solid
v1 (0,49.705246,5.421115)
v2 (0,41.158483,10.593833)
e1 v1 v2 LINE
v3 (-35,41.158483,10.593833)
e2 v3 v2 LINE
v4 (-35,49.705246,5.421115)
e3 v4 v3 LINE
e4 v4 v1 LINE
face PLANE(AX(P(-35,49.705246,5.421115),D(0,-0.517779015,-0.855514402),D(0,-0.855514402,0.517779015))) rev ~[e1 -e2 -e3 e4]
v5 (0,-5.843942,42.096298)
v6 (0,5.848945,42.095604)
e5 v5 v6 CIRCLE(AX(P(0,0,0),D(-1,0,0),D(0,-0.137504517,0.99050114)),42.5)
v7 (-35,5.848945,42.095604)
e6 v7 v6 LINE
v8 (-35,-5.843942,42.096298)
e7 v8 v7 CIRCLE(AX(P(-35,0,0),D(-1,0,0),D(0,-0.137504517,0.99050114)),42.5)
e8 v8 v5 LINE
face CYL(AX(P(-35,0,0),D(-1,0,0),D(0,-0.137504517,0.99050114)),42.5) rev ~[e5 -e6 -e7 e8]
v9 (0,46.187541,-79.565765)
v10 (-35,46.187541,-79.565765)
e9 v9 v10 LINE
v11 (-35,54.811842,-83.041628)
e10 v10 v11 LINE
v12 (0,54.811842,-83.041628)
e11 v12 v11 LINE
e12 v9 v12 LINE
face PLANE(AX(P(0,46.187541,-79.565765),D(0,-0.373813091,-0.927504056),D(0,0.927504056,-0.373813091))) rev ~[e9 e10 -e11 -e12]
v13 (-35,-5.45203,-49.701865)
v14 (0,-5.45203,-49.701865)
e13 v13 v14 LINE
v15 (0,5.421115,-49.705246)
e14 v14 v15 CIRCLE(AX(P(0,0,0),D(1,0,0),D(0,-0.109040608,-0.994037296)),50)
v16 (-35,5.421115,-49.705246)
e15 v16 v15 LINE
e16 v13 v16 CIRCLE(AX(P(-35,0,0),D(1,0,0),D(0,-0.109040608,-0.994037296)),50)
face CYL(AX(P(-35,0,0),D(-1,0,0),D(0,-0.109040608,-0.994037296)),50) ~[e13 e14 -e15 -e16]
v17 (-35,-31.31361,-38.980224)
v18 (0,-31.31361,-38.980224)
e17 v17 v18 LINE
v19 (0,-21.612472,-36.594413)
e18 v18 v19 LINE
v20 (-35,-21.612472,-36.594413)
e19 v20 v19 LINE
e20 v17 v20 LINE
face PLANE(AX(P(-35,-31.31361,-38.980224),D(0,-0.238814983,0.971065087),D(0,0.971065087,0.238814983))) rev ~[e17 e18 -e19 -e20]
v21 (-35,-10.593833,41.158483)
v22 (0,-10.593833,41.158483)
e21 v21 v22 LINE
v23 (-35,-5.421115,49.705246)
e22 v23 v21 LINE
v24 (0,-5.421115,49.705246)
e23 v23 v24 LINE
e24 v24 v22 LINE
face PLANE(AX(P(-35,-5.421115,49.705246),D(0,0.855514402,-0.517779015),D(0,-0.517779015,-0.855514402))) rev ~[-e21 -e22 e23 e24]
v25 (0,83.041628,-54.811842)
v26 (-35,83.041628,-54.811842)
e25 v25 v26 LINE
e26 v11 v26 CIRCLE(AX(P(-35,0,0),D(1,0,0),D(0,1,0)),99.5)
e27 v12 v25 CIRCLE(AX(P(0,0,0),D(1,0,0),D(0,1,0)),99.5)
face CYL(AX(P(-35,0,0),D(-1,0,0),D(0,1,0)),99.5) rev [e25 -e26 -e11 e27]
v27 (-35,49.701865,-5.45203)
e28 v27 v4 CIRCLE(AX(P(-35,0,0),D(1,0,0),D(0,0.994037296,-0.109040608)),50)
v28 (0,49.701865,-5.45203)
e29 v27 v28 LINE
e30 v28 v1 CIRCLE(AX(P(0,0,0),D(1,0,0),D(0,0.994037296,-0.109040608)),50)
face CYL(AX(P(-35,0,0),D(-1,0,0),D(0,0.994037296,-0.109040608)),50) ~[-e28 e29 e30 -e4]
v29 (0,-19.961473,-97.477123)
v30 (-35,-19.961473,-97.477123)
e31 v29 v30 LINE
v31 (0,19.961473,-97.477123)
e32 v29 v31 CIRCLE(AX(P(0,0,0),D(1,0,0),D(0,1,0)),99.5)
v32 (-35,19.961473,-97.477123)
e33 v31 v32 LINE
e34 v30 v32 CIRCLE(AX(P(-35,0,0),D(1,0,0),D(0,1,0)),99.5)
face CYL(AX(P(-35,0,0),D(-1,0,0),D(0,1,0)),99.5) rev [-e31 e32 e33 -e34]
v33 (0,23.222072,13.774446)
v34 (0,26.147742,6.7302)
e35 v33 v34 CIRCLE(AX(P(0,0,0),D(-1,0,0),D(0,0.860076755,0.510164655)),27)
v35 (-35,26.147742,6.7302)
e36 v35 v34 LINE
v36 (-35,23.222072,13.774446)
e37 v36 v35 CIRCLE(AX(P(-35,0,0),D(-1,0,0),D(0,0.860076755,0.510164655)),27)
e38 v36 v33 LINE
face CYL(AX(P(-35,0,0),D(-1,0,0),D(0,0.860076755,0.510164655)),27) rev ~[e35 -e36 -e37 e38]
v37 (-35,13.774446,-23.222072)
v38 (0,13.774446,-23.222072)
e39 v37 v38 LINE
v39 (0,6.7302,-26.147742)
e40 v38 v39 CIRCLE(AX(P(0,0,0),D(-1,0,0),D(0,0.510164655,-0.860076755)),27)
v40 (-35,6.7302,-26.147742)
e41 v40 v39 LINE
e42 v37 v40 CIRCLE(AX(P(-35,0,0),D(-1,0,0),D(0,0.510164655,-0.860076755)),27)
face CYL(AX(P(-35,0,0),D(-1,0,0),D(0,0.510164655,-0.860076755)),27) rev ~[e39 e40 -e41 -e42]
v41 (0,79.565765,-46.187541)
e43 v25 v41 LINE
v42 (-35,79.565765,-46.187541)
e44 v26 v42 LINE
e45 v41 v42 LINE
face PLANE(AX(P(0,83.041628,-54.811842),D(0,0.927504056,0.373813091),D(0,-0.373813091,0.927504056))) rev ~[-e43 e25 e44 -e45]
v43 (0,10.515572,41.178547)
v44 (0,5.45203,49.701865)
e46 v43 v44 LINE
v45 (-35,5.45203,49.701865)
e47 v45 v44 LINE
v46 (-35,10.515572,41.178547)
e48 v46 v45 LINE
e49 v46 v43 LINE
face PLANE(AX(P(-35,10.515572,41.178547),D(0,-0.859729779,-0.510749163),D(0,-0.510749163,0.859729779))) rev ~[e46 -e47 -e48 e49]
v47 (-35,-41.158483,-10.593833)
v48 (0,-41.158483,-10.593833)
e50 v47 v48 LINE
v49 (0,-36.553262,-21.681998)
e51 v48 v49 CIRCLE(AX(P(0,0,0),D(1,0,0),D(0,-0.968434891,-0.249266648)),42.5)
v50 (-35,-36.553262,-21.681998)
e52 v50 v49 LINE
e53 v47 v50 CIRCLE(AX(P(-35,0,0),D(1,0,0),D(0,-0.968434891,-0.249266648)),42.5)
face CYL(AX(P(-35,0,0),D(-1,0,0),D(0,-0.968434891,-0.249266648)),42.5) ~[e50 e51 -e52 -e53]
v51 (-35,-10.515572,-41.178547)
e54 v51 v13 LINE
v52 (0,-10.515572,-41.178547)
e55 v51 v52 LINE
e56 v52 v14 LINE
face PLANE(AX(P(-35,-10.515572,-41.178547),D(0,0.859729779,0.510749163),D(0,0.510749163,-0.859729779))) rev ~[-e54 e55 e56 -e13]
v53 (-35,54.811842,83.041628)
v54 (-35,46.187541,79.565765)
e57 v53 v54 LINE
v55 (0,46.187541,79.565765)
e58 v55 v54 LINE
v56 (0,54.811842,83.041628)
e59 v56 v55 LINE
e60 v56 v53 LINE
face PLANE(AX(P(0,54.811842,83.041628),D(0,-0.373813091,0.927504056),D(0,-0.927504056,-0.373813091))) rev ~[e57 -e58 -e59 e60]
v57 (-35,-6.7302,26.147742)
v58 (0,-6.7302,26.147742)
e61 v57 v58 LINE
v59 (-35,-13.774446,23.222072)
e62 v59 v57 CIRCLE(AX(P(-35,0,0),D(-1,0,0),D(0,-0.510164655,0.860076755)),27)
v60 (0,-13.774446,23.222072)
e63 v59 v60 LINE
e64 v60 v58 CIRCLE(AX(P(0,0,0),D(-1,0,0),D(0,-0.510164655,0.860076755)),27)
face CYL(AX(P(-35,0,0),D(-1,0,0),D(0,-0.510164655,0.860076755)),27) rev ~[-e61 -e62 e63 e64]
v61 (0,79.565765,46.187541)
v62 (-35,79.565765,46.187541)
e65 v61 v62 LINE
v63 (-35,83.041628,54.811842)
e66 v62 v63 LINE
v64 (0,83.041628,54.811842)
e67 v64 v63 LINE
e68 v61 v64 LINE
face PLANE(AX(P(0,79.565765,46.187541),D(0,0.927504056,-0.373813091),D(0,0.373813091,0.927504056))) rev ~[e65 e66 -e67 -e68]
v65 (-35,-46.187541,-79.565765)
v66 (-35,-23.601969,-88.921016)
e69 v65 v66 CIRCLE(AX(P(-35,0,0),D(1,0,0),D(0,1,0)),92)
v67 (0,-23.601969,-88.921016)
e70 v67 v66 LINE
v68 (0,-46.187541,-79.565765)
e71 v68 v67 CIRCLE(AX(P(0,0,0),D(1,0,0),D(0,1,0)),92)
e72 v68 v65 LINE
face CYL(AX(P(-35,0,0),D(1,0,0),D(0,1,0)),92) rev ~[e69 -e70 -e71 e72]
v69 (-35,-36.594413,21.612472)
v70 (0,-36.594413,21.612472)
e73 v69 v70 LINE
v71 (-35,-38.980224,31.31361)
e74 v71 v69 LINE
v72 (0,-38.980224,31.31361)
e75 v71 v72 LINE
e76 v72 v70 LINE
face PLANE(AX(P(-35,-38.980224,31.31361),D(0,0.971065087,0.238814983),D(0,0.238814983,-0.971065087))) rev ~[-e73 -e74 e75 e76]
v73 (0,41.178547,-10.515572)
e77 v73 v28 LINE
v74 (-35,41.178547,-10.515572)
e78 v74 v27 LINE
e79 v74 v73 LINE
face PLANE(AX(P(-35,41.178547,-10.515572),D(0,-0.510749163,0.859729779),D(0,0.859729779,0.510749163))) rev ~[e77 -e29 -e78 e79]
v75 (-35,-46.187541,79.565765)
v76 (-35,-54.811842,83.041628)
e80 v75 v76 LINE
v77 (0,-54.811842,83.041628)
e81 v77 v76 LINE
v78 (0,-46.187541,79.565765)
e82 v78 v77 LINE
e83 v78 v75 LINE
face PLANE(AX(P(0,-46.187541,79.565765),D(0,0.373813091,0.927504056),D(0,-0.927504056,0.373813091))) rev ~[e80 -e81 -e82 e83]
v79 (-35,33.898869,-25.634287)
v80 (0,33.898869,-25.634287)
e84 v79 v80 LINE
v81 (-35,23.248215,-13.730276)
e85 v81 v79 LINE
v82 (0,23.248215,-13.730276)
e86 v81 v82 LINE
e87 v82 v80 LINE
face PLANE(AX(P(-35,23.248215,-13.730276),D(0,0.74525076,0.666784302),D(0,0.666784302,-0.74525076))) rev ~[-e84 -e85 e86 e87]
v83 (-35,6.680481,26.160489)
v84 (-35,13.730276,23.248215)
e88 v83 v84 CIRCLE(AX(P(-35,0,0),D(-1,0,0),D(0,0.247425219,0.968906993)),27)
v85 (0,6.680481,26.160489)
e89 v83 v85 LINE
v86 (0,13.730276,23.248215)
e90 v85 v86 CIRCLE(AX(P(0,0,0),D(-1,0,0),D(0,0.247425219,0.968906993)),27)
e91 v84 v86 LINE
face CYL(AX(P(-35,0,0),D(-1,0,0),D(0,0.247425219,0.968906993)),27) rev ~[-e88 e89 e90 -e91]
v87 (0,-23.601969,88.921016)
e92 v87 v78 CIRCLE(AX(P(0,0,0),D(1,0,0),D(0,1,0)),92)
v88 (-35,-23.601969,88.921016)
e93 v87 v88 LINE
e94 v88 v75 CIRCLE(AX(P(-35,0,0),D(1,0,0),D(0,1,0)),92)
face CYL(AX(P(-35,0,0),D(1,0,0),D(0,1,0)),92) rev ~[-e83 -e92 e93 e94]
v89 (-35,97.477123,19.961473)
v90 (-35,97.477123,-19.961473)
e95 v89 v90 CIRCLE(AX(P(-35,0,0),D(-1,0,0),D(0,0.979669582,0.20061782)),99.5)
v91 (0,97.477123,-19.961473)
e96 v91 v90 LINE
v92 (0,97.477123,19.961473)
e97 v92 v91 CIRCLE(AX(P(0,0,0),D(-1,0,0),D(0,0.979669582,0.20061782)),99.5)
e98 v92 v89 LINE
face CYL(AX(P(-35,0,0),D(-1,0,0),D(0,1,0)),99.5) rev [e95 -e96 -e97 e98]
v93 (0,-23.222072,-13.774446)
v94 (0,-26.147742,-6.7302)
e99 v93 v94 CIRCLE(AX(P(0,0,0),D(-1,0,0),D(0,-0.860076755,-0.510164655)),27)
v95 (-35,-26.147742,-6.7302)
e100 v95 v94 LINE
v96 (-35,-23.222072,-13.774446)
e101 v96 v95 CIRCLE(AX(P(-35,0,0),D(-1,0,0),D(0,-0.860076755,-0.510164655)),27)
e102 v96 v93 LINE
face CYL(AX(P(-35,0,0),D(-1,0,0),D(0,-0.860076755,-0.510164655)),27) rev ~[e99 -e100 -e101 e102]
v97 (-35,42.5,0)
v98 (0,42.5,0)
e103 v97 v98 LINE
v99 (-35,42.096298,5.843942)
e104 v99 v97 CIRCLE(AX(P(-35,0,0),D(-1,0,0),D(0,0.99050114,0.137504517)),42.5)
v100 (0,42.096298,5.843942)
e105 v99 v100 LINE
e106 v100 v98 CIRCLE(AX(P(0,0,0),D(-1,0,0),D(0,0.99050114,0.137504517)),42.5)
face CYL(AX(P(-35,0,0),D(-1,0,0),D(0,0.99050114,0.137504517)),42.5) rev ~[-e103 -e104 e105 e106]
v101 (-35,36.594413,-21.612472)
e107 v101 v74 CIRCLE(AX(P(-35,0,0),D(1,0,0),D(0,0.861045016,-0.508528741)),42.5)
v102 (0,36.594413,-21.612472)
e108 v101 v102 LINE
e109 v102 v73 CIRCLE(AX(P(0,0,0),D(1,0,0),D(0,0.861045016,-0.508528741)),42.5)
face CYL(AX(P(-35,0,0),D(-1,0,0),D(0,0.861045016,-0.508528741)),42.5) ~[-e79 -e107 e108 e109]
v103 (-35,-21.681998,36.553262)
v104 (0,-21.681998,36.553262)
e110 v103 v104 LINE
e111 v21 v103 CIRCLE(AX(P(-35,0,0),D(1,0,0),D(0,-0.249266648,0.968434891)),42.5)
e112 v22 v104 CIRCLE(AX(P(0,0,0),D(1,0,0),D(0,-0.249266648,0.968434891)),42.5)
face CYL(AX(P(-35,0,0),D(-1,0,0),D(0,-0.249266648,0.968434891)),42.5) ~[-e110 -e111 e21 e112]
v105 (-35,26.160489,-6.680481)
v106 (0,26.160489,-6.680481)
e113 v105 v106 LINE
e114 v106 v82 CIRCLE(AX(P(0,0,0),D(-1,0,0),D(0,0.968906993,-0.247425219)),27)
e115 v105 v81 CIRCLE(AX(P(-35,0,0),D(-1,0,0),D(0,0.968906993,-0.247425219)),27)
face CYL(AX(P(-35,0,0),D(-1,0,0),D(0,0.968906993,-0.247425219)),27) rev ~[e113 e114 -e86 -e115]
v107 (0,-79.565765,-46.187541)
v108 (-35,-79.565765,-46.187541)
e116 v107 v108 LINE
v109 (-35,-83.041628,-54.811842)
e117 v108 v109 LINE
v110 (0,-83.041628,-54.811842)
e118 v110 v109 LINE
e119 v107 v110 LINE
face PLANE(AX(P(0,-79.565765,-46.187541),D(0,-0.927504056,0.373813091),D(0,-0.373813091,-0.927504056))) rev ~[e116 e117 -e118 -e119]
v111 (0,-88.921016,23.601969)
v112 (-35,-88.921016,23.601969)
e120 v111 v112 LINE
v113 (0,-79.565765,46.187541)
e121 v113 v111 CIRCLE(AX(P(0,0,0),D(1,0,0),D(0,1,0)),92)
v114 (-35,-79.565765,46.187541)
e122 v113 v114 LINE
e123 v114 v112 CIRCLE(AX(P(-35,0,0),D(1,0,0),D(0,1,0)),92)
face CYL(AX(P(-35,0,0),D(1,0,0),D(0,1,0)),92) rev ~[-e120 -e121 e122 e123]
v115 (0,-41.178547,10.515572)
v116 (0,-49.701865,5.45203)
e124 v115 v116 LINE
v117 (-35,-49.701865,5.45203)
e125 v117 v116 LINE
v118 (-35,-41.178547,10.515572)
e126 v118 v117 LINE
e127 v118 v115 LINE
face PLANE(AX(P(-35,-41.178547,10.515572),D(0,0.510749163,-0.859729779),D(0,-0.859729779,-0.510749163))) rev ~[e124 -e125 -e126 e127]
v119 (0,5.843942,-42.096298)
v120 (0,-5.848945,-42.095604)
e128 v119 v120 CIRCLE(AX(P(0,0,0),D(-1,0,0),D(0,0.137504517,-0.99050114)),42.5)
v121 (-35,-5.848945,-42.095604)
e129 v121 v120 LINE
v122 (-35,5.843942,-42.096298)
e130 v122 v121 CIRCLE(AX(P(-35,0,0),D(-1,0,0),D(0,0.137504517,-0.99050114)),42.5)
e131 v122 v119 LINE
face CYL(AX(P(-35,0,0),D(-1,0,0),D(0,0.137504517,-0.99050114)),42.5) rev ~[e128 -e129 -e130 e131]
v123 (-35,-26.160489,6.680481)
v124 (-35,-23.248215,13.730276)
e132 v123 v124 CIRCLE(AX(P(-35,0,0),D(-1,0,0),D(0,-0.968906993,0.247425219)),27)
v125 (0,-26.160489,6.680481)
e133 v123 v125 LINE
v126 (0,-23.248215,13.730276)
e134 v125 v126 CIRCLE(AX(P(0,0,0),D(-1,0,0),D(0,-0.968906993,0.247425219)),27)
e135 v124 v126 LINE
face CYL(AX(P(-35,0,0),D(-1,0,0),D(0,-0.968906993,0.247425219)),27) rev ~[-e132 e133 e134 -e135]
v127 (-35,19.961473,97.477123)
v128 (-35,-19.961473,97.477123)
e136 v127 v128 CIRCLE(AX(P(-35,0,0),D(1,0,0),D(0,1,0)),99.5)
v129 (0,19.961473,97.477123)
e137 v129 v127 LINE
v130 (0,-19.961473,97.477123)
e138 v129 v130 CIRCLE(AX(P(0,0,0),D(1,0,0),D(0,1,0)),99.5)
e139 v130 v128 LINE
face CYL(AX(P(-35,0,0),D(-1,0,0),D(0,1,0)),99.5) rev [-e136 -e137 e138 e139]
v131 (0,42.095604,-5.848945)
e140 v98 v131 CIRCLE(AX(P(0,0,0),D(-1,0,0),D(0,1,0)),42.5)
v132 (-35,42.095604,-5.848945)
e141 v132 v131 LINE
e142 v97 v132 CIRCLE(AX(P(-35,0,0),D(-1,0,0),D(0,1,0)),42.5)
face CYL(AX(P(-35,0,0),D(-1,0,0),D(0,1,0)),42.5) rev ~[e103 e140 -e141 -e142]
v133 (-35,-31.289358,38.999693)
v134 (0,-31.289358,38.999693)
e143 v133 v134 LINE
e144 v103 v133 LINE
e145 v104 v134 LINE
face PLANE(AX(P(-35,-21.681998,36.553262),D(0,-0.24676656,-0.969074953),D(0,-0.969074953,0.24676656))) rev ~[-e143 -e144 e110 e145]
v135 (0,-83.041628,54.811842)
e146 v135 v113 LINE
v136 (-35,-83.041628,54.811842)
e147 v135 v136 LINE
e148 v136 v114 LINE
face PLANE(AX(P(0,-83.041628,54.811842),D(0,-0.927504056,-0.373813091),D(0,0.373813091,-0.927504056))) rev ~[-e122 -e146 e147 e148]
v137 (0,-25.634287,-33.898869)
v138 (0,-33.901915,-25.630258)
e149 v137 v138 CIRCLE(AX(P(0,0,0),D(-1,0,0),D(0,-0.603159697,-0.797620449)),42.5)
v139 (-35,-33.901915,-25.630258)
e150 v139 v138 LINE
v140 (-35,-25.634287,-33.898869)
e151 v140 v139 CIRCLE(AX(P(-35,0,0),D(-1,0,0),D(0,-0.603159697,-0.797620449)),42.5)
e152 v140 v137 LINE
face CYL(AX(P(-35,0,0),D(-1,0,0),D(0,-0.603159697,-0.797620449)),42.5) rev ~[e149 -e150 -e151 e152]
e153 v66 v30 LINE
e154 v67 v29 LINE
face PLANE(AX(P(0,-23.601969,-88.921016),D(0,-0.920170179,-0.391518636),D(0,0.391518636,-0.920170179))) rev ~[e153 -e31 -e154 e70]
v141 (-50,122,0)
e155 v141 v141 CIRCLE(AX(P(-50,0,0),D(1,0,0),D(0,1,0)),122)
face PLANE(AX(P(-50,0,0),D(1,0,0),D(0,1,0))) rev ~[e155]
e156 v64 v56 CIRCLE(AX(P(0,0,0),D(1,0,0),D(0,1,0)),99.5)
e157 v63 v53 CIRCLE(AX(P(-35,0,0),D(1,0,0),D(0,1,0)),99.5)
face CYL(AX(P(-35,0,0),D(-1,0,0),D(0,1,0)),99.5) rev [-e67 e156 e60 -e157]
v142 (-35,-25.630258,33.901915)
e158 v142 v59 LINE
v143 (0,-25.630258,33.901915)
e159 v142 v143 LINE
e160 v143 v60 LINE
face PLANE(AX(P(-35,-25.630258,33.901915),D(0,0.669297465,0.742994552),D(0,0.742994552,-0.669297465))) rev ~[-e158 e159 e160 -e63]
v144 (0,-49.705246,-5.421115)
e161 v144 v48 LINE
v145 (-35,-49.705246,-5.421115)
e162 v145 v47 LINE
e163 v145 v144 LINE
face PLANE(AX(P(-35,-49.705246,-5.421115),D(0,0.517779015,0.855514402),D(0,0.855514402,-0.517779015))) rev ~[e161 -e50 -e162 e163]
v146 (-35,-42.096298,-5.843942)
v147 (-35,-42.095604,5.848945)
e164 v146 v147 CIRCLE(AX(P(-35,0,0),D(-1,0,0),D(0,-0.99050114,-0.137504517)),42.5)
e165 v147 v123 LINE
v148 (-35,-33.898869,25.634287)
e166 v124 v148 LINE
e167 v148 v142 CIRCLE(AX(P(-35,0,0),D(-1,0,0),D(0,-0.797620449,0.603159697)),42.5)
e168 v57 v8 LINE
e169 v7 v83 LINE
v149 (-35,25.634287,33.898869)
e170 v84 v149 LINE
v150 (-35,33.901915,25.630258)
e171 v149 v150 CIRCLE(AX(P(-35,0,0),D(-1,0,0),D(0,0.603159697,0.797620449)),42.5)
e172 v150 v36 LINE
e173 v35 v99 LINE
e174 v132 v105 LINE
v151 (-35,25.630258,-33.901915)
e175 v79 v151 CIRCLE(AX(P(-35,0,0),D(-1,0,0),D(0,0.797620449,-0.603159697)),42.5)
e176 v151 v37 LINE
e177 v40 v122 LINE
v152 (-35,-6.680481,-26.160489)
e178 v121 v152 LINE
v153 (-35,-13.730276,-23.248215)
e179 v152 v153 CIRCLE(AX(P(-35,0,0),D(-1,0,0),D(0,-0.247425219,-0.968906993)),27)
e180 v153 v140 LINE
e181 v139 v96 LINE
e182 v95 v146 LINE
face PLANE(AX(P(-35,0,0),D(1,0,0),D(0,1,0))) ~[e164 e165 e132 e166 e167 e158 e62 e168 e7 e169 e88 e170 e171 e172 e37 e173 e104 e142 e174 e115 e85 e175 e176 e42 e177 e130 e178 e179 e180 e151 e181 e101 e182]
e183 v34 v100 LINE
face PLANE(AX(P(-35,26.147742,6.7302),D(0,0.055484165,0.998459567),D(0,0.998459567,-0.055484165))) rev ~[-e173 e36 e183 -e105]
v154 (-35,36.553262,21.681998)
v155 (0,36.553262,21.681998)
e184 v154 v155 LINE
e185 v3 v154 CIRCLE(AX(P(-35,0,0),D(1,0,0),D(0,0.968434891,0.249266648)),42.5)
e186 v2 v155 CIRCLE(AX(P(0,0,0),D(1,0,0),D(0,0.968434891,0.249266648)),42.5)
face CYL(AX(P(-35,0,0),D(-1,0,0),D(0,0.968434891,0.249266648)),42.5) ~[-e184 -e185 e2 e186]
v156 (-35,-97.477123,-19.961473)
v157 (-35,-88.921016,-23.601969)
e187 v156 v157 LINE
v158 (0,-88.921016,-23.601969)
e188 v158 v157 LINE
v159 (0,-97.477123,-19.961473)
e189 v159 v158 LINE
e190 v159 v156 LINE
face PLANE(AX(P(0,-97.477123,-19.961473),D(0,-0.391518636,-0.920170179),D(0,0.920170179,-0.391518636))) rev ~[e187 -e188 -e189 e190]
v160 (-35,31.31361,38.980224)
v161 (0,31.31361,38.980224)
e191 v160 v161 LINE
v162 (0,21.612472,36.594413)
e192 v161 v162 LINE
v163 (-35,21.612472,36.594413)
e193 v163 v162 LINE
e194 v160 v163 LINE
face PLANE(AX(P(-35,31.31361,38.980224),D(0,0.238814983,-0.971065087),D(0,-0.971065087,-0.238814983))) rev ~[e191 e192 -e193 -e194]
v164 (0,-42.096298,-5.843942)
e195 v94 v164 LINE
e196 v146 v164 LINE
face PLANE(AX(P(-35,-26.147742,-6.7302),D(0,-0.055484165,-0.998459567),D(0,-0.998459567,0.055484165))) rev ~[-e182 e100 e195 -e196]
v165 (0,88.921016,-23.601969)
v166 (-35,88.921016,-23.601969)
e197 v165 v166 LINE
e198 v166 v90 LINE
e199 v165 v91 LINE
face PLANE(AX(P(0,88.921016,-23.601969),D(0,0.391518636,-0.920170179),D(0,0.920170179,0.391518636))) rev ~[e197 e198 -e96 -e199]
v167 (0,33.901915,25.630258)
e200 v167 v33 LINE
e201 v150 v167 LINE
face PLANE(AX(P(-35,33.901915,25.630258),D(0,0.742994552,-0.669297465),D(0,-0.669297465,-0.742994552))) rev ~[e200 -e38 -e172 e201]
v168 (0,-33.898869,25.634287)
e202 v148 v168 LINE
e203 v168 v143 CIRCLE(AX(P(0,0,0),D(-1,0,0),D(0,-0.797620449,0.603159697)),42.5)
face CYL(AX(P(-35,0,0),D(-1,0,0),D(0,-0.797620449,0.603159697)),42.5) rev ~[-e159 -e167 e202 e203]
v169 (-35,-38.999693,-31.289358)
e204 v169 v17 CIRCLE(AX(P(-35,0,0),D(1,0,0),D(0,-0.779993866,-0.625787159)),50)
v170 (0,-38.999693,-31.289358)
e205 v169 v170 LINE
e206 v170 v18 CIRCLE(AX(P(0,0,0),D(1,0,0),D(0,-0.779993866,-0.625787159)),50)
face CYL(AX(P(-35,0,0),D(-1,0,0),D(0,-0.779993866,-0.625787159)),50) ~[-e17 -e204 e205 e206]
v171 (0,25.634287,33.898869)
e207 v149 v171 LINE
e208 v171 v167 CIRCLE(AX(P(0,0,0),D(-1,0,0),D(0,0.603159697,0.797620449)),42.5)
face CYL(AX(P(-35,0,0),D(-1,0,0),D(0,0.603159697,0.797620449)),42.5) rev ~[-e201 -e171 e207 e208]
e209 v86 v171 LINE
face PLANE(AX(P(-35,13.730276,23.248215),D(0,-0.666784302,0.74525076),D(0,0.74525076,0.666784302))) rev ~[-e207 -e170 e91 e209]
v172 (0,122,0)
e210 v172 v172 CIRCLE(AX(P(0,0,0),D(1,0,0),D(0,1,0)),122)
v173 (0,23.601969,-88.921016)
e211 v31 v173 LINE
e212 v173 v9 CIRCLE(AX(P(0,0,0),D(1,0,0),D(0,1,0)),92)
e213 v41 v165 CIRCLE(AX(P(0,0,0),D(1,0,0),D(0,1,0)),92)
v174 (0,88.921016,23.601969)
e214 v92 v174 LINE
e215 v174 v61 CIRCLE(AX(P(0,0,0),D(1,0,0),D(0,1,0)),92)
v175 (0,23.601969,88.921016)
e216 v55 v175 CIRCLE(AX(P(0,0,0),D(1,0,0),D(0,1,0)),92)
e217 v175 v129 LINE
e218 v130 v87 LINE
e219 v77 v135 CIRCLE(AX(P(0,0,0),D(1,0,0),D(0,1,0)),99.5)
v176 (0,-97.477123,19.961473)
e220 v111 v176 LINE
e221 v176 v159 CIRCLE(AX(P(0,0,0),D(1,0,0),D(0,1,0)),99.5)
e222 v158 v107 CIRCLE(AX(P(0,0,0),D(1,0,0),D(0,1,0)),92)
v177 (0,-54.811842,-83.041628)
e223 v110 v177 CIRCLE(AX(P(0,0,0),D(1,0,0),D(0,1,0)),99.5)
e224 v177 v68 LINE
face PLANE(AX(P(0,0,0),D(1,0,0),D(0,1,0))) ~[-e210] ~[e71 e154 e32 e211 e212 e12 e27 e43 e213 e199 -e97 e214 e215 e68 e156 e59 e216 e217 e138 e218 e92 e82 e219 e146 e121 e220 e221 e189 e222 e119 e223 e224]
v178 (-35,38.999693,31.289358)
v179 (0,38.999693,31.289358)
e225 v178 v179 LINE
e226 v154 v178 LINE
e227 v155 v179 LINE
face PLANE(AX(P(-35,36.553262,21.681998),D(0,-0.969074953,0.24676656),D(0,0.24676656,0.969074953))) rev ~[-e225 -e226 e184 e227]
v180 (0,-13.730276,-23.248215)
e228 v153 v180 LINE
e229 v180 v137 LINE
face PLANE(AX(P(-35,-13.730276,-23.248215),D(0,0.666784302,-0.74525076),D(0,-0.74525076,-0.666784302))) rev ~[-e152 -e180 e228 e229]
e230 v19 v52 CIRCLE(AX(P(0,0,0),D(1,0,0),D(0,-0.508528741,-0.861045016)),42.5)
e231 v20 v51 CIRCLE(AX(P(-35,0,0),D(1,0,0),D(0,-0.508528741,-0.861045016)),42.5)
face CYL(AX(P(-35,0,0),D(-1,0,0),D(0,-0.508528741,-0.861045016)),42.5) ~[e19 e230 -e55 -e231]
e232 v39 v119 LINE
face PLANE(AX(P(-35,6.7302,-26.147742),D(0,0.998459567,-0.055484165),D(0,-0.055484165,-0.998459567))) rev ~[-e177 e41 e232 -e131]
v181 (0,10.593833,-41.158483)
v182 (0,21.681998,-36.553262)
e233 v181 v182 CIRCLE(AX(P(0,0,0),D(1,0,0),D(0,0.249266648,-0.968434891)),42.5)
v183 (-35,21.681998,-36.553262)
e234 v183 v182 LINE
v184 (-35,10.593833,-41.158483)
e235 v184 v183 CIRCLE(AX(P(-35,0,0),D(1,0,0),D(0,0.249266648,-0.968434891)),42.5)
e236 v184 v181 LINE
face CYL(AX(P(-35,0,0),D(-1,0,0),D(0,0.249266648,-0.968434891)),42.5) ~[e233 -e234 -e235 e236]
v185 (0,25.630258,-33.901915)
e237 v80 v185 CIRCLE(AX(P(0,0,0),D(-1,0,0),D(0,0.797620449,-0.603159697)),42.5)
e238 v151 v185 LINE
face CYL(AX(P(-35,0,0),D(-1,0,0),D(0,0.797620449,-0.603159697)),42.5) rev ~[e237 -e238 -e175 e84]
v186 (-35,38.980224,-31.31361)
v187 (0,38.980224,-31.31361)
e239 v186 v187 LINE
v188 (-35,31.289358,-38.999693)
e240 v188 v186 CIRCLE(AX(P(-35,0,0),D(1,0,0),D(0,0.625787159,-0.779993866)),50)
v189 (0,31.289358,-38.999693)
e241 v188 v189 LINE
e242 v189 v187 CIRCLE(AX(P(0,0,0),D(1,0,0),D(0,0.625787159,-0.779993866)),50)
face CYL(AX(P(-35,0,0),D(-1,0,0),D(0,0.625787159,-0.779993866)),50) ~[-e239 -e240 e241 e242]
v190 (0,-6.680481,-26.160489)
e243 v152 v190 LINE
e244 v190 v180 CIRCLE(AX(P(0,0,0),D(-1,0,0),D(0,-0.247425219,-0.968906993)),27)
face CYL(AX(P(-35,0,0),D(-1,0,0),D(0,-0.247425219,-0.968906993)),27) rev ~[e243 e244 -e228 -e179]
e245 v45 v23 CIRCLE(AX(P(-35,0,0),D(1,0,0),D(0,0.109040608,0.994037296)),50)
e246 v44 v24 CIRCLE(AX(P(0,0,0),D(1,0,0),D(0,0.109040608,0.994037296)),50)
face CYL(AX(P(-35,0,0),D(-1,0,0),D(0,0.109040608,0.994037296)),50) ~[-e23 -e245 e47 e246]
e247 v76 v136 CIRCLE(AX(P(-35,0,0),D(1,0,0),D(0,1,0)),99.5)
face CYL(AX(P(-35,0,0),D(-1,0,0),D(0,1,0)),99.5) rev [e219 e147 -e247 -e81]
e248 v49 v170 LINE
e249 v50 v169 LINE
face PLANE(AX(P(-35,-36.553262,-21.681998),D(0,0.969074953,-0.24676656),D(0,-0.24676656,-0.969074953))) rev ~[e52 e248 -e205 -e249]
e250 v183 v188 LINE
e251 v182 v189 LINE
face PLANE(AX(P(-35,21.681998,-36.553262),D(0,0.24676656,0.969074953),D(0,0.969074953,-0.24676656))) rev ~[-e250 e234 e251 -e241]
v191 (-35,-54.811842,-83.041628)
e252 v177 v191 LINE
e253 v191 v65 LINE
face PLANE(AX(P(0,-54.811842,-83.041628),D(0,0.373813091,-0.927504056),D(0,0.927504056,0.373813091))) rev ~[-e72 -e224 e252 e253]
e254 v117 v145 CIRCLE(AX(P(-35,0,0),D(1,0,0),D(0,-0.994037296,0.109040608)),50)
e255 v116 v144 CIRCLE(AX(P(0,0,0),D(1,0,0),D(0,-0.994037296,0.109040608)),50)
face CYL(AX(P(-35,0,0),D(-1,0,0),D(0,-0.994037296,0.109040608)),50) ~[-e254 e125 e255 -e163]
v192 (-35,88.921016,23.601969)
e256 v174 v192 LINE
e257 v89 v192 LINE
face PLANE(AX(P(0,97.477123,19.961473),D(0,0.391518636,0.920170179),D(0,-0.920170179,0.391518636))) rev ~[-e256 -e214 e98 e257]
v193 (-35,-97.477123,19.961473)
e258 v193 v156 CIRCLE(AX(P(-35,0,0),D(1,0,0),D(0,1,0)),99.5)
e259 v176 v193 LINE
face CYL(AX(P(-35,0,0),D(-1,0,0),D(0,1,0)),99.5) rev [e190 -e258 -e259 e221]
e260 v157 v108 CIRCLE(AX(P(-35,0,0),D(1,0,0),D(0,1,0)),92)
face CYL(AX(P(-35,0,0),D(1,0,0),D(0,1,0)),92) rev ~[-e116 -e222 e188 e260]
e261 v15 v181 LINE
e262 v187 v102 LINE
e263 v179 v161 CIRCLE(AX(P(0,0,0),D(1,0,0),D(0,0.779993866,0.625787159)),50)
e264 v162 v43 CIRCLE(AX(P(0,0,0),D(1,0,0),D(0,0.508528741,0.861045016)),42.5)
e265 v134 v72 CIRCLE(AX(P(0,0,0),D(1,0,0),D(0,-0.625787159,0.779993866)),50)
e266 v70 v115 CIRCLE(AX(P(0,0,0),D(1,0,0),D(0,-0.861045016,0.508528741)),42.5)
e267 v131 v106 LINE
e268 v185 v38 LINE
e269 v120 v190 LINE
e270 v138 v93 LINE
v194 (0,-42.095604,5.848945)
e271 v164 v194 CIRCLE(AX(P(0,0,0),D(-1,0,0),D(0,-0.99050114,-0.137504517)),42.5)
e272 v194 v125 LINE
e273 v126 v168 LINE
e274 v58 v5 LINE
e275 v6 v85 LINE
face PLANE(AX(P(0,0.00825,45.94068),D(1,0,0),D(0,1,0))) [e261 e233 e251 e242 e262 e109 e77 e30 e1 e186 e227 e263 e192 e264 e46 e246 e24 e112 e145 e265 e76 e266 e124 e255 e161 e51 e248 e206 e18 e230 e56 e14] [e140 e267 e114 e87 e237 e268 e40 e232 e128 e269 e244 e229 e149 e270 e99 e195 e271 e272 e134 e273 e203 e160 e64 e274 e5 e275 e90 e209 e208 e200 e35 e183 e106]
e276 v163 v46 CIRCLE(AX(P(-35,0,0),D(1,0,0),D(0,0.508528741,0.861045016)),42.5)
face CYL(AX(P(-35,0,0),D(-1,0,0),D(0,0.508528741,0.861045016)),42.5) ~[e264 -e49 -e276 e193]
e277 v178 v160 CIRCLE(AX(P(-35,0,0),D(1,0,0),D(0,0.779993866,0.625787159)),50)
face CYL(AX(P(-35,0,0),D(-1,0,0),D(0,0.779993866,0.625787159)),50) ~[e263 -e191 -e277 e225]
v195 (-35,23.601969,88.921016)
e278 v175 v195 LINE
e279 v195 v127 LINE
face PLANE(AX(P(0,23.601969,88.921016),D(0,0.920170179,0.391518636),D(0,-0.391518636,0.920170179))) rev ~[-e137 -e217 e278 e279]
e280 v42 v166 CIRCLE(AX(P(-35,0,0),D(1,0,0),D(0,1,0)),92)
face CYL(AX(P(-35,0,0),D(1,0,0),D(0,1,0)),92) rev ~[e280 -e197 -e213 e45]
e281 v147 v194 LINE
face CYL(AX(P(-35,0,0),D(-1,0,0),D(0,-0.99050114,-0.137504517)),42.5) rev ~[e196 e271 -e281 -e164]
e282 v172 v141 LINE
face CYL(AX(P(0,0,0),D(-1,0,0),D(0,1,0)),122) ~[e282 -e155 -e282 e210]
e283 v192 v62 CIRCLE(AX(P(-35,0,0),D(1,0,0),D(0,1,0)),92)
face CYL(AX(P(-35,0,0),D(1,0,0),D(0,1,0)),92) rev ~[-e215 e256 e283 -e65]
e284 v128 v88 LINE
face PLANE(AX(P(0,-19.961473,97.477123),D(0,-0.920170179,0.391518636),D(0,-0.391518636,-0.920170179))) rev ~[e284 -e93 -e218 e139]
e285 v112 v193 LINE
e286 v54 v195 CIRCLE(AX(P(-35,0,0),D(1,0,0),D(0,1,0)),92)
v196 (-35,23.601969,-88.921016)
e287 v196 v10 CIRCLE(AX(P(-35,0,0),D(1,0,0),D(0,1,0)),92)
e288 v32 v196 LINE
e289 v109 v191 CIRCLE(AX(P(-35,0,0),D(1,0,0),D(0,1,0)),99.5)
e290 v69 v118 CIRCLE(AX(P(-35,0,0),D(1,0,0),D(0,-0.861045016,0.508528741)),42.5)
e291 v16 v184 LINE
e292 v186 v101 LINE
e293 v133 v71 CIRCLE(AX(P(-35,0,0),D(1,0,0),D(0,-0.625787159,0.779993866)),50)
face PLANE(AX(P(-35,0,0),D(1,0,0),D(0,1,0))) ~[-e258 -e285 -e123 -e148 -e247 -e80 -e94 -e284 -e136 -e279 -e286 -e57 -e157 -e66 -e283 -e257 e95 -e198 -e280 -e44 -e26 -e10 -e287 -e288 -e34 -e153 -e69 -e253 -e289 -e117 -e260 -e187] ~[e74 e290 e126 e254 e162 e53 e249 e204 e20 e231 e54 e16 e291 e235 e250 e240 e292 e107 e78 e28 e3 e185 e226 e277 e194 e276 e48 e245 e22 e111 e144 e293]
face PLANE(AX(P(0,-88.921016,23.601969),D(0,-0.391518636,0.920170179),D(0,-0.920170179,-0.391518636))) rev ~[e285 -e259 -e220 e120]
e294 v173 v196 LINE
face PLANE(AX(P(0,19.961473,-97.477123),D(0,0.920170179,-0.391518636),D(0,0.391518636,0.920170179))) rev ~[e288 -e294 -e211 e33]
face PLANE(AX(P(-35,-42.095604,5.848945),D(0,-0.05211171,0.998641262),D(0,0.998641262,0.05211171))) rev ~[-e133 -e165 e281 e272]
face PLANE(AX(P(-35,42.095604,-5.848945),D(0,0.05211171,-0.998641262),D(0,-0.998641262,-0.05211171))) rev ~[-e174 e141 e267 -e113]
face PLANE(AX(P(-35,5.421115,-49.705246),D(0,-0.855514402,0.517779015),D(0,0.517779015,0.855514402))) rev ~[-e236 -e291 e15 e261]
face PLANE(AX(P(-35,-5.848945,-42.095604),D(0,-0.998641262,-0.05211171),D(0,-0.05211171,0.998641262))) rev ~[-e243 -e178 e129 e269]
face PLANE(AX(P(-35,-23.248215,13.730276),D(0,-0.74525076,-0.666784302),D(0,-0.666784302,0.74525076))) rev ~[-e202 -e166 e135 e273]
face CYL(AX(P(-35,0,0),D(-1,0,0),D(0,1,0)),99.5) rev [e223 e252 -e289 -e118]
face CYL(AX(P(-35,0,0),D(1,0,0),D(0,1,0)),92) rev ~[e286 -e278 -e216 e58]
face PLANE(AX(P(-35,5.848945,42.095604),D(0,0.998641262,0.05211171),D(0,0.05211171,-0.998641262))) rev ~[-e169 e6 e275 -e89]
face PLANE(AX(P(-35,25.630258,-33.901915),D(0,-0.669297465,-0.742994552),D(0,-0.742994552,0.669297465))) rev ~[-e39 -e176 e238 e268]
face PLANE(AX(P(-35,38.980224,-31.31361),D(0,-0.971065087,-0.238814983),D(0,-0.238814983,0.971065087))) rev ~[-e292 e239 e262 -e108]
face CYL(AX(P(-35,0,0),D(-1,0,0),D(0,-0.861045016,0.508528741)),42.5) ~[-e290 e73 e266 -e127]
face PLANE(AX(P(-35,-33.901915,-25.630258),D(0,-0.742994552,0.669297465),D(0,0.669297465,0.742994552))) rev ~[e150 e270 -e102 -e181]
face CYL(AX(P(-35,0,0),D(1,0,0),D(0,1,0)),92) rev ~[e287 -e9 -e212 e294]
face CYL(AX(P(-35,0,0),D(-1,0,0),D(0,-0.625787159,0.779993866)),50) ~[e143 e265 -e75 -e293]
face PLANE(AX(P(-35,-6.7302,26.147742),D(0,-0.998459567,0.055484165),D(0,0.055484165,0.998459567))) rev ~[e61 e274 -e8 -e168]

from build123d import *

# Parameters (mm, degrees)
F3_DEPTH = 35
F6_DEPTH = 35
F7_R     = 116.5
F7_R_2   = 99.5
F8_DEPTH = 35


# Not quite as in the source:
# - a feature names something its author has since deleted; it is built from what else it names


with BuildPart() as f1:
    # F0 (on Top) → F1 (revolve)
    with BuildSketch(Plane.XY):
        Polygon((-35, 92), (0, 92), (0, 122), (-50, 122), (-50, 0), (-35, 0), align=None)
    revolve(axis=Axis((-42.5, 0, 0), (1, 0, 0)))

    # F2 (on face) → F3 (cut)
    with BuildSketch(Plane.YZ):
        with BuildLine():
            ThreePointArc((-23.6019687167, 88.9210159225), (0, 92), (23.6019687167, 88.9210159225))
            Line((23.6019687167, 88.9210159225), (19.9614730536, 97.4771234369))
            ThreePointArc((19.9614730536, 97.4771234369), (0, 99.5), (-19.9614730536, 97.4771234369))
            Line((-19.9614730536, 97.4771234369), (-23.6019687167, 88.9210159225))
        make_face()
        with BuildLine():
            ThreePointArc((-19.9614730536, 97.4771234369), (0, 99.5), (19.9614730536, 97.4771234369))
            Line((19.9614730536, 97.4771234369), (12.8102793756, 114.2842803815))
            ThreePointArc((12.8102793756, 114.2842803815), (0, 115), (-12.8102793756, 114.2842803815))
            Line((-12.8102793756, 114.2842803815), (-19.9614730536, 97.4771234369))
        make_face()
        with BuildLine():
            ThreePointArc((-79.5657654778, 46.1875412199), (-65.0538238692, 65.0538238692), (-46.1875412199, 79.5657654778))
            Line((-46.1875412199, 79.5657654778), (-54.8118420341, 83.0416279515))
            ThreePointArc((-54.8118420341, 83.0416279515), (-70.3571247281, 70.3571247281), (-83.0416279515, 54.8118420341))
            Line((-83.0416279515, 54.8118420341), (-79.5657654778, 46.1875412199))
        make_face()
        with BuildLine():
            ThreePointArc((-83.0416279515, 54.8118420341), (-70.3571247281, 70.3571247281), (-54.8118420341, 83.0416279515))
            Line((-54.8118420341, 83.0416279515), (-71.7529542254, 89.8694250562))
            ThreePointArc((-71.7529542254, 89.8694250562), (-81.3172798365, 81.3172798365), (-89.8694250562, 71.7529542254))
            Line((-89.8694250562, 71.7529542254), (-83.0416279515, 54.8118420341))
        make_face()
        with BuildLine():
            ThreePointArc((-88.9210159225, -23.6019687167), (-92, 0), (-88.9210159225, 23.6019687167))
            Line((-88.9210159225, 23.6019687167), (-97.4771234369, 19.9614730536))
            ThreePointArc((-97.4771234369, 19.9614730536), (-99.5, 0), (-97.4771234369, -19.9614730536))
            Line((-97.4771234369, -19.9614730536), (-88.9210159225, -23.6019687167))
        make_face()
        with BuildLine():
            ThreePointArc((-97.4771234369, -19.9614730536), (-99.5, 0), (-97.4771234369, 19.9614730536))
            Line((-97.4771234369, 19.9614730536), (-114.2842803815, 12.8102793756))
            ThreePointArc((-114.2842803815, 12.8102793756), (-115, 0), (-114.2842803815, -12.8102793756))
            Line((-114.2842803815, -12.8102793756), (-97.4771234369, -19.9614730536))
        make_face()
        with BuildLine():
            ThreePointArc((-46.1875412199, -79.5657654778), (-65.0538238692, -65.0538238692), (-79.5657654778, -46.1875412199))
            Line((-79.5657654778, -46.1875412199), (-83.0416279515, -54.8118420341))
            ThreePointArc((-83.0416279515, -54.8118420341), (-70.3571247281, -70.3571247281), (-54.8118420341, -83.0416279515))
            Line((-54.8118420341, -83.0416279515), (-46.1875412199, -79.5657654778))
        make_face()
        with BuildLine():
            ThreePointArc((-54.8118420341, -83.0416279515), (-70.3571247281, -70.3571247281), (-83.0416279515, -54.8118420341))
            Line((-83.0416279515, -54.8118420341), (-89.8694250562, -71.7529542254))
            ThreePointArc((-89.8694250562, -71.7529542254), (-81.3172798365, -81.3172798365), (-71.7529542254, -89.8694250562))
            Line((-71.7529542254, -89.8694250562), (-54.8118420341, -83.0416279515))
        make_face()
        with BuildLine():
            Line((19.9614730536, -97.4771234369), (23.6019687167, -88.9210159225))
            ThreePointArc((23.6019687167, -88.9210159225), (0, -92), (-23.6019687167, -88.9210159225))
            Line((-23.6019687167, -88.9210159225), (-19.9614730536, -97.4771234369))
            ThreePointArc((-19.9614730536, -97.4771234369), (0, -99.5), (19.9614730536, -97.4771234369))
        make_face()
        with BuildLine():
            Line((12.8102793756, -114.2842803815), (19.9614730536, -97.4771234369))
            ThreePointArc((19.9614730536, -97.4771234369), (0, -99.5), (-19.9614730536, -97.4771234369))
            Line((-19.9614730536, -97.4771234369), (-12.8102793756, -114.2842803815))
            ThreePointArc((-12.8102793756, -114.2842803815), (0, -115), (12.8102793756, -114.2842803815))
        make_face()
        with BuildLine():
            Line((83.0416279515, -54.8118420341), (79.5657654778, -46.1875412199))
            ThreePointArc((79.5657654778, -46.1875412199), (65.0538238692, -65.0538238692), (46.1875412199, -79.5657654778))
            Line((46.1875412199, -79.5657654778), (54.8118420341, -83.0416279515))
            ThreePointArc((54.8118420341, -83.0416279515), (70.3571247281, -70.3571247281), (83.0416279515, -54.8118420341))
        make_face()
        with BuildLine():
            Line((89.8694250562, -71.7529542254), (83.0416279515, -54.8118420341))
            ThreePointArc((83.0416279515, -54.8118420341), (70.3571247281, -70.3571247281), (54.8118420341, -83.0416279515))
            Line((54.8118420341, -83.0416279515), (71.7529542254, -89.8694250562))
            ThreePointArc((71.7529542254, -89.8694250562), (81.3172798365, -81.3172798365), (89.8694250562, -71.7529542254))
        make_face()
        with BuildLine():
            Line((97.4771234369, 19.9614730536), (88.9210159225, 23.6019687167))
            ThreePointArc((88.9210159225, 23.6019687167), (91.2270065958, 11.9009775886), (92, 0))
            ThreePointArc((92, 0), (91.2270065958, -11.9009775886), (88.9210159225, -23.6019687167))
            Line((88.9210159225, -23.6019687167), (97.4771234369, -19.9614730536))
            ThreePointArc((97.4771234369, -19.9614730536), (98.9929891002, -10.0318547146), (99.5, 0))
            ThreePointArc((99.5, 0), (98.9929891002, 10.0318547146), (97.4771234369, 19.9614730536))
        make_face()
        with BuildLine():
            Line((114.2842803815, 12.8102793756), (97.4771234369, 19.9614730536))
            ThreePointArc((97.4771234369, 19.9614730536), (98.9929891002, 10.0318547146), (99.5, 0))
            ThreePointArc((99.5, 0), (98.9929891002, -10.0318547146), (97.4771234369, -19.9614730536))
            Line((97.4771234369, -19.9614730536), (114.2842803815, -12.8102793756))
            ThreePointArc((114.2842803815, -12.8102793756), (115, 0), (114.2842803815, 12.8102793756))
        make_face()
        with BuildLine():
            Line((54.8118420341, 83.0416279515), (46.1875412199, 79.5657654778))
            ThreePointArc((46.1875412199, 79.5657654778), (65.0538238692, 65.0538238692), (79.5657654778, 46.1875412199))
            Line((79.5657654778, 46.1875412199), (83.0416279515, 54.8118420341))
            ThreePointArc((83.0416279515, 54.8118420341), (70.3571247281, 70.3571247281), (54.8118420341, 83.0416279515))
        make_face()
        with BuildLine():
            Line((71.7529542254, 89.8694250562), (54.8118420341, 83.0416279515))
            ThreePointArc((54.8118420341, 83.0416279515), (70.3571247281, 70.3571247281), (83.0416279515, 54.8118420341))
            Line((83.0416279515, 54.8118420341), (89.8694250562, 71.7529542254))
            ThreePointArc((89.8694250562, 71.7529542254), (81.3172798365, 81.3172798365), (71.7529542254, 89.8694250562))
        make_face()
    extrude(amount=-F3_DEPTH, mode=Mode.SUBTRACT)

    # F5 (on face) → F6 (join)
    with BuildSketch(Plane.YZ.offset(-35)):
        with BuildLine():
            Line((5.8489450002, 42.0956035992), (5.452030419, 49.7018647971))
            ThreePointArc((5.452030419, 49.7018647971), (0.0155501533, 49.9999975819), (-5.4211145011, 49.7052463787))
            Line((-5.4211145011, 49.7052463787), (-5.8439419576, 42.0962984406))
            ThreePointArc((-5.8439419576, 42.0962984406), (0.0025255316, 42.499999925), (5.8489450002, 42.0956035992))
        make_face()
        with BuildLine():
            Line((10.5155718212, 41.1785471972), (5.452030419, 49.7018647971))
            Line((5.452030419, 49.7018647971), (5.8489450002, 42.0956035992))
            ThreePointArc((5.8489450002, 42.0956035992), (8.1950961441, 41.7024027987), (10.5155718212, 41.1785471972))
        make_face()
        with BuildLine():
            Line((-5.8439419576, 42.0962984406), (-5.4211145011, 49.7052463787))
            Line((-5.4211145011, 49.7052463787), (-10.5938325524, 41.1584828663))
            ThreePointArc((-10.5938325524, 41.1584828663), (-8.2322525607, 41.6950838562), (-5.8439419576, 42.0962984406))
        make_face()
        with BuildLine():
            ThreePointArc((10.5155718212, 41.1785471972), (8.1950961441, 41.7024027987), (5.8489450002, 42.0956035992))
            Line((5.8489450002, 42.0956035992), (6.6804809217, 26.1604888076))
            ThreePointArc((6.6804809217, 26.1604888076), (10.3087382214, 24.9545570244), (13.7302760127, 23.2482154286))
            Line((13.7302760127, 23.2482154286), (25.6342871031, 33.8988690772))
            ThreePointArc((25.6342871031, 33.8988690772), (23.6617949268, 35.303958147), (21.6124715015, 36.5944131746))
            ThreePointArc((21.6124715015, 36.5944131746), (16.2267175708, 39.2803212421), (10.5155718212, 41.1785471972))
        make_face()
        with BuildLine():
            Line((-6.7301995039, 26.1477420562), (-5.8439419576, 42.0962984406))
            ThreePointArc((-5.8439419576, 42.0962984406), (-8.2322525607, 41.6950838562), (-10.5938325524, 41.1584828663))
            ThreePointArc((-10.5938325524, 41.1584828663), (-16.3013594868, 39.2494035481), (-21.6819978197, 36.5532621054))
            ThreePointArc((-21.6819978197, 36.5532621054), (-23.6932437548, 35.2828598667), (-25.6302580907, 33.9019154356))
            Line((-25.6302580907, 33.9019154356), (-13.7744456737, 23.2220723964))
            ThreePointArc((-13.7744456737, 23.2220723964), (-10.3561577916, 24.9349151953), (-6.7301995039, 26.1477420562))
        make_face()
        with BuildLine():
            Line((31.3136099496, 38.9802236003), (21.6124715015, 36.5944131746))
            ThreePointArc((21.6124715015, 36.5944131746), (23.6617949268, 35.303958147), (25.6342871031, 33.8988690772))
            Line((25.6342871031, 33.8988690772), (31.3136099496, 38.9802236003))
        make_face()
        with BuildLine():
            ThreePointArc((-25.6302580907, 33.9019154356), (-23.6932437548, 35.2828598667), (-21.6819978197, 36.5532621054))
            Line((-21.6819978197, 36.5532621054), (-31.2893579551, 38.9996933162))
            Line((-31.2893579551, 38.9996933162), (-25.6302580907, 33.9019154356))
        make_face()
        with BuildLine():
            Line((31.3136099496, 38.9802236003), (25.6342871031, 33.8988690772))
            ThreePointArc((25.6342871031, 33.8988690772), (30.0538239679, 30.0502523268), (33.9019154356, 25.6302580907))
            Line((33.9019154356, 25.6302580907), (38.9996933162, 31.2893579551))
            ThreePointArc((38.9996933162, 31.2893579551), (35.3663329683, 35.3443417306), (31.3136099496, 38.9802236003))
        make_face()
        with BuildLine():
            ThreePointArc((-33.8988690772, 25.6342871031), (-30.0502523268, 30.0538239679), (-25.6302580907, 33.9019154356))
            Line((-25.6302580907, 33.9019154356), (-31.2893579551, 38.9996933162))
            ThreePointArc((-31.2893579551, 38.9996933162), (-35.3443417306, 35.3663329683), (-38.9802236003, 31.3136099496))
            Line((-38.9802236003, 31.3136099496), (-33.8988690772, 25.6342871031))
        make_face()
        with BuildLine():
            Line((33.9019154356, 25.6302580907), (23.2220723964, 13.7744456737))
            ThreePointArc((23.2220723964, 13.7744456737), (24.9349151953, 10.3561577916), (26.1477420562, 6.7301995039))
            Line((26.1477420562, 6.7301995039), (42.0962984406, 5.8439419576))
            ThreePointArc((42.0962984406, 5.8439419576), (41.6950838562, 8.2322525607), (41.1584828663, 10.5938325524))
            ThreePointArc((41.1584828663, 10.5938325524), (39.2494035481, 16.3013594868), (36.5532621054, 21.6819978197))
            ThreePointArc((36.5532621054, 21.6819978197), (35.2828598667, 23.6932437548), (33.9019154356, 25.6302580907))
        make_face()
        with BuildLine():
            Line((38.9996933162, 31.2893579551), (33.9019154356, 25.6302580907))
            ThreePointArc((33.9019154356, 25.6302580907), (35.2828598667, 23.6932437548), (36.5532621054, 21.6819978197))
            Line((36.5532621054, 21.6819978197), (38.9996933162, 31.2893579551))
        make_face()
        with BuildLine():
            ThreePointArc((-26.1604888076, 6.6804809217), (-24.9545570244, 10.3087382214), (-23.2482154286, 13.7302760127))
            Line((-23.2482154286, 13.7302760127), (-33.8988690772, 25.6342871031))
            ThreePointArc((-33.8988690772, 25.6342871031), (-35.303958147, 23.6617949268), (-36.5944131746, 21.6124715015))
            ThreePointArc((-36.5944131746, 21.6124715015), (-39.2803212421, 16.2267175708), (-41.1785471972, 10.5155718212))
            ThreePointArc((-41.1785471972, 10.5155718212), (-41.7024027987, 8.1950961441), (-42.0956035992, 5.8489450002))
            Line((-42.0956035992, 5.8489450002), (-26.1604888076, 6.6804809217))
        make_face()
        with BuildLine():
            ThreePointArc((-36.5944131746, 21.6124715015), (-35.303958147, 23.6617949268), (-33.8988690772, 25.6342871031))
            Line((-33.8988690772, 25.6342871031), (-38.9802236003, 31.3136099496))
            Line((-38.9802236003, 31.3136099496), (-36.5944131746, 21.6124715015))
        make_face()
        with BuildLine():
            ThreePointArc((41.1584828663, 10.5938325524), (41.6950838562, 8.2322525607), (42.0962984406, 5.8439419576))
            Line((42.0962984406, 5.8439419576), (49.7052463787, 5.4211145011))
            Line((49.7052463787, 5.4211145011), (41.1584828663, 10.5938325524))
        make_face()
        with BuildLine():
            Line((49.7052463787, 5.4211145011), (42.0962984406, 5.8439419576))
            ThreePointArc((42.0962984406, 5.8439419576), (42.3989544902, 2.9289346422), (42.5, 0))
            ThreePointArc((42.5, 0), (42.3987803655, -2.9314541641), (42.0956035992, -5.8489450002))
            Line((42.0956035992, -5.8489450002), (49.7018647971, -5.452030419))
            ThreePointArc((49.7018647971, -5.452030419), (49.9999975819, -0.0155501533), (49.7052463787, 5.4211145011))
        make_face()
        with BuildLine():
            ThreePointArc((-23.2220723964, -13.7744456737), (-24.9349151953, -10.3561577916), (-26.1477420562, -6.7301995039))
            Line((-26.1477420562, -6.7301995039), (-42.0962984406, -5.8439419576))
            ThreePointArc((-42.0962984406, -5.8439419576), (-41.6950838562, -8.2322525607), (-41.1584828663, -10.5938325524))
            ThreePointArc((-41.1584828663, -10.5938325524), (-39.2494035481, -16.3013594868), (-36.5532621054, -21.6819978197))
            ThreePointArc((-36.5532621054, -21.6819978197), (-35.2828598667, -23.6932437548), (-33.9019154356, -25.6302580907))
            Line((-33.9019154356, -25.6302580907), (-23.2220723964, -13.7744456737))
        make_face()
        with BuildLine():
            ThreePointArc((-42.0962984406, -5.8439419576), (-42.499999925, 0.0025255316), (-42.0956035992, 5.8489450002))
            Line((-42.0956035992, 5.8489450002), (-49.7018647971, 5.452030419))
            ThreePointArc((-49.7018647971, 5.452030419), (-49.9999975819, 0.0155501533), (-49.7052463787, -5.4211145011))
            Line((-49.7052463787, -5.4211145011), (-42.0962984406, -5.8439419576))
        make_face()
        with BuildLine():
            Line((-49.7018647971, 5.452030419), (-42.0956035992, 5.8489450002))
            ThreePointArc((-42.0956035992, 5.8489450002), (-41.7024027987, 8.1950961441), (-41.1785471972, 10.5155718212))
            Line((-41.1785471972, 10.5155718212), (-49.7018647971, 5.452030419))
        make_face()
        with BuildLine():
            Line((42.0956035992, -5.8489450002), (26.1604888076, -6.6804809217))
            ThreePointArc((26.1604888076, -6.6804809217), (24.9545570244, -10.3087382214), (23.2482154286, -13.7302760127))
            Line((23.2482154286, -13.7302760127), (33.8988690772, -25.6342871031))
            ThreePointArc((33.8988690772, -25.6342871031), (35.303958147, -23.6617949268), (36.5944131746, -21.6124715015))
            ThreePointArc((36.5944131746, -21.6124715015), (39.2803212421, -16.2267175708), (41.1785471972, -10.5155718212))
            ThreePointArc((41.1785471972, -10.5155718212), (41.7024027987, -8.1950961441), (42.0956035992, -5.8489450002))
        make_face()
        with BuildLine():
            ThreePointArc((-41.1584828663, -10.5938325524), (-41.6950838562, -8.2322525607), (-42.0962984406, -5.8439419576))
            Line((-42.0962984406, -5.8439419576), (-49.7052463787, -5.4211145011))
            Line((-49.7052463787, -5.4211145011), (-41.1584828663, -10.5938325524))
        make_face()
        with BuildLine():
            Line((49.7018647971, -5.452030419), (42.0956035992, -5.8489450002))
            ThreePointArc((42.0956035992, -5.8489450002), (41.7024027987, -8.1950961441), (41.1785471972, -10.5155718212))
            Line((41.1785471972, -10.5155718212), (49.7018647971, -5.452030419))
        make_face()
        with BuildLine():
            ThreePointArc((-6.6804809217, -26.1604888076), (-10.3087382214, -24.9545570244), (-13.7302760127, -23.2482154286))
            Line((-13.7302760127, -23.2482154286), (-25.6342871031, -33.8988690772))
            ThreePointArc((-25.6342871031, -33.8988690772), (-23.6617949268, -35.303958147), (-21.6124715015, -36.5944131746))
            ThreePointArc((-21.6124715015, -36.5944131746), (-16.2267175708, -39.2803212421), (-10.5155718212, -41.1785471972))
            ThreePointArc((-10.5155718212, -41.1785471972), (-8.1950961441, -41.7024027987), (-5.8489450002, -42.0956035992))
            Line((-5.8489450002, -42.0956035992), (-6.6804809217, -26.1604888076))
        make_face()
        with BuildLine():
            ThreePointArc((-25.6342871031, -33.8988690772), (-30.0538239679, -30.0502523268), (-33.9019154356, -25.6302580907))
            Line((-33.9019154356, -25.6302580907), (-38.9996933162, -31.2893579551))
            ThreePointArc((-38.9996933162, -31.2893579551), (-35.3663329683, -35.3443417306), (-31.3136099496, -38.9802236003))
            Line((-31.3136099496, -38.9802236003), (-25.6342871031, -33.8988690772))
        make_face()
        with BuildLine():
            Line((-38.9996933162, -31.2893579551), (-33.9019154356, -25.6302580907))
            ThreePointArc((-33.9019154356, -25.6302580907), (-35.2828598667, -23.6932437548), (-36.5532621054, -21.6819978197))
            Line((-36.5532621054, -21.6819978197), (-38.9996933162, -31.2893579551))
        make_face()
        with BuildLine():
            Line((25.6302580907, -33.9019154356), (13.7744456737, -23.2220723964))
            ThreePointArc((13.7744456737, -23.2220723964), (10.3561577916, -24.9349151953), (6.7301995039, -26.1477420562))
            Line((6.7301995039, -26.1477420562), (5.8439419576, -42.0962984406))
            ThreePointArc((5.8439419576, -42.0962984406), (8.2322525607, -41.6950838562), (10.5938325524, -41.1584828663))
            ThreePointArc((10.5938325524, -41.1584828663), (16.3013594868, -39.2494035481), (21.6819978197, -36.5532621054))
            ThreePointArc((21.6819978197, -36.5532621054), (23.6932437548, -35.2828598667), (25.6302580907, -33.9019154356))
        make_face()
        with BuildLine():
            ThreePointArc((36.5944131746, -21.6124715015), (35.303958147, -23.6617949268), (33.8988690772, -25.6342871031))
            Line((33.8988690772, -25.6342871031), (38.9802236003, -31.3136099496))
            Line((38.9802236003, -31.3136099496), (36.5944131746, -21.6124715015))
        make_face()
        with BuildLine():
            Line((38.9802236003, -31.3136099496), (33.8988690772, -25.6342871031))
            ThreePointArc((33.8988690772, -25.6342871031), (30.0502523268, -30.0538239679), (25.6302580907, -33.9019154356))
            Line((25.6302580907, -33.9019154356), (31.2893579551, -38.9996933162))
            ThreePointArc((31.2893579551, -38.9996933162), (35.3443417306, -35.3663329683), (38.9802236003, -31.3136099496))
        make_face()
        with BuildLine():
            ThreePointArc((-21.6124715015, -36.5944131746), (-23.6617949268, -35.303958147), (-25.6342871031, -33.8988690772))
            Line((-25.6342871031, -33.8988690772), (-31.3136099496, -38.9802236003))
            Line((-31.3136099496, -38.9802236003), (-21.6124715015, -36.5944131746))
        make_face()
        with BuildLine():
            Line((31.2893579551, -38.9996933162), (25.6302580907, -33.9019154356))
            ThreePointArc((25.6302580907, -33.9019154356), (23.6932437548, -35.2828598667), (21.6819978197, -36.5532621054))
            Line((21.6819978197, -36.5532621054), (31.2893579551, -38.9996933162))
        make_face()
        with BuildLine():
            ThreePointArc((5.8439419576, -42.0962984406), (-0.0025255316, -42.499999925), (-5.8489450002, -42.0956035992))
            Line((-5.8489450002, -42.0956035992), (-5.452030419, -49.7018647971))
            ThreePointArc((-5.452030419, -49.7018647971), (-0.0155501533, -49.9999975819), (5.4211145011, -49.7052463787))
            Line((5.4211145011, -49.7052463787), (5.8439419576, -42.0962984406))
        make_face()
        with BuildLine():
            Line((-5.452030419, -49.7018647971), (-5.8489450002, -42.0956035992))
            ThreePointArc((-5.8489450002, -42.0956035992), (-8.1950961441, -41.7024027987), (-10.5155718212, -41.1785471972))
            Line((-10.5155718212, -41.1785471972), (-5.452030419, -49.7018647971))
        make_face()
        with BuildLine():
            ThreePointArc((10.5938325524, -41.1584828663), (8.2322525607, -41.6950838562), (5.8439419576, -42.0962984406))
            Line((5.8439419576, -42.0962984406), (5.4211145011, -49.7052463787))
            Line((5.4211145011, -49.7052463787), (10.5938325524, -41.1584828663))
        make_face()
    extrude(amount=F6_DEPTH)

    # F7 (on face) → F8 (join)
    with BuildSketch(Plane.YZ.offset(-35)):
        Circle(F7_R)
        Circle(F7_R_2, mode=Mode.SUBTRACT)
    extrude(amount=F8_DEPTH)


solid = f1.part
